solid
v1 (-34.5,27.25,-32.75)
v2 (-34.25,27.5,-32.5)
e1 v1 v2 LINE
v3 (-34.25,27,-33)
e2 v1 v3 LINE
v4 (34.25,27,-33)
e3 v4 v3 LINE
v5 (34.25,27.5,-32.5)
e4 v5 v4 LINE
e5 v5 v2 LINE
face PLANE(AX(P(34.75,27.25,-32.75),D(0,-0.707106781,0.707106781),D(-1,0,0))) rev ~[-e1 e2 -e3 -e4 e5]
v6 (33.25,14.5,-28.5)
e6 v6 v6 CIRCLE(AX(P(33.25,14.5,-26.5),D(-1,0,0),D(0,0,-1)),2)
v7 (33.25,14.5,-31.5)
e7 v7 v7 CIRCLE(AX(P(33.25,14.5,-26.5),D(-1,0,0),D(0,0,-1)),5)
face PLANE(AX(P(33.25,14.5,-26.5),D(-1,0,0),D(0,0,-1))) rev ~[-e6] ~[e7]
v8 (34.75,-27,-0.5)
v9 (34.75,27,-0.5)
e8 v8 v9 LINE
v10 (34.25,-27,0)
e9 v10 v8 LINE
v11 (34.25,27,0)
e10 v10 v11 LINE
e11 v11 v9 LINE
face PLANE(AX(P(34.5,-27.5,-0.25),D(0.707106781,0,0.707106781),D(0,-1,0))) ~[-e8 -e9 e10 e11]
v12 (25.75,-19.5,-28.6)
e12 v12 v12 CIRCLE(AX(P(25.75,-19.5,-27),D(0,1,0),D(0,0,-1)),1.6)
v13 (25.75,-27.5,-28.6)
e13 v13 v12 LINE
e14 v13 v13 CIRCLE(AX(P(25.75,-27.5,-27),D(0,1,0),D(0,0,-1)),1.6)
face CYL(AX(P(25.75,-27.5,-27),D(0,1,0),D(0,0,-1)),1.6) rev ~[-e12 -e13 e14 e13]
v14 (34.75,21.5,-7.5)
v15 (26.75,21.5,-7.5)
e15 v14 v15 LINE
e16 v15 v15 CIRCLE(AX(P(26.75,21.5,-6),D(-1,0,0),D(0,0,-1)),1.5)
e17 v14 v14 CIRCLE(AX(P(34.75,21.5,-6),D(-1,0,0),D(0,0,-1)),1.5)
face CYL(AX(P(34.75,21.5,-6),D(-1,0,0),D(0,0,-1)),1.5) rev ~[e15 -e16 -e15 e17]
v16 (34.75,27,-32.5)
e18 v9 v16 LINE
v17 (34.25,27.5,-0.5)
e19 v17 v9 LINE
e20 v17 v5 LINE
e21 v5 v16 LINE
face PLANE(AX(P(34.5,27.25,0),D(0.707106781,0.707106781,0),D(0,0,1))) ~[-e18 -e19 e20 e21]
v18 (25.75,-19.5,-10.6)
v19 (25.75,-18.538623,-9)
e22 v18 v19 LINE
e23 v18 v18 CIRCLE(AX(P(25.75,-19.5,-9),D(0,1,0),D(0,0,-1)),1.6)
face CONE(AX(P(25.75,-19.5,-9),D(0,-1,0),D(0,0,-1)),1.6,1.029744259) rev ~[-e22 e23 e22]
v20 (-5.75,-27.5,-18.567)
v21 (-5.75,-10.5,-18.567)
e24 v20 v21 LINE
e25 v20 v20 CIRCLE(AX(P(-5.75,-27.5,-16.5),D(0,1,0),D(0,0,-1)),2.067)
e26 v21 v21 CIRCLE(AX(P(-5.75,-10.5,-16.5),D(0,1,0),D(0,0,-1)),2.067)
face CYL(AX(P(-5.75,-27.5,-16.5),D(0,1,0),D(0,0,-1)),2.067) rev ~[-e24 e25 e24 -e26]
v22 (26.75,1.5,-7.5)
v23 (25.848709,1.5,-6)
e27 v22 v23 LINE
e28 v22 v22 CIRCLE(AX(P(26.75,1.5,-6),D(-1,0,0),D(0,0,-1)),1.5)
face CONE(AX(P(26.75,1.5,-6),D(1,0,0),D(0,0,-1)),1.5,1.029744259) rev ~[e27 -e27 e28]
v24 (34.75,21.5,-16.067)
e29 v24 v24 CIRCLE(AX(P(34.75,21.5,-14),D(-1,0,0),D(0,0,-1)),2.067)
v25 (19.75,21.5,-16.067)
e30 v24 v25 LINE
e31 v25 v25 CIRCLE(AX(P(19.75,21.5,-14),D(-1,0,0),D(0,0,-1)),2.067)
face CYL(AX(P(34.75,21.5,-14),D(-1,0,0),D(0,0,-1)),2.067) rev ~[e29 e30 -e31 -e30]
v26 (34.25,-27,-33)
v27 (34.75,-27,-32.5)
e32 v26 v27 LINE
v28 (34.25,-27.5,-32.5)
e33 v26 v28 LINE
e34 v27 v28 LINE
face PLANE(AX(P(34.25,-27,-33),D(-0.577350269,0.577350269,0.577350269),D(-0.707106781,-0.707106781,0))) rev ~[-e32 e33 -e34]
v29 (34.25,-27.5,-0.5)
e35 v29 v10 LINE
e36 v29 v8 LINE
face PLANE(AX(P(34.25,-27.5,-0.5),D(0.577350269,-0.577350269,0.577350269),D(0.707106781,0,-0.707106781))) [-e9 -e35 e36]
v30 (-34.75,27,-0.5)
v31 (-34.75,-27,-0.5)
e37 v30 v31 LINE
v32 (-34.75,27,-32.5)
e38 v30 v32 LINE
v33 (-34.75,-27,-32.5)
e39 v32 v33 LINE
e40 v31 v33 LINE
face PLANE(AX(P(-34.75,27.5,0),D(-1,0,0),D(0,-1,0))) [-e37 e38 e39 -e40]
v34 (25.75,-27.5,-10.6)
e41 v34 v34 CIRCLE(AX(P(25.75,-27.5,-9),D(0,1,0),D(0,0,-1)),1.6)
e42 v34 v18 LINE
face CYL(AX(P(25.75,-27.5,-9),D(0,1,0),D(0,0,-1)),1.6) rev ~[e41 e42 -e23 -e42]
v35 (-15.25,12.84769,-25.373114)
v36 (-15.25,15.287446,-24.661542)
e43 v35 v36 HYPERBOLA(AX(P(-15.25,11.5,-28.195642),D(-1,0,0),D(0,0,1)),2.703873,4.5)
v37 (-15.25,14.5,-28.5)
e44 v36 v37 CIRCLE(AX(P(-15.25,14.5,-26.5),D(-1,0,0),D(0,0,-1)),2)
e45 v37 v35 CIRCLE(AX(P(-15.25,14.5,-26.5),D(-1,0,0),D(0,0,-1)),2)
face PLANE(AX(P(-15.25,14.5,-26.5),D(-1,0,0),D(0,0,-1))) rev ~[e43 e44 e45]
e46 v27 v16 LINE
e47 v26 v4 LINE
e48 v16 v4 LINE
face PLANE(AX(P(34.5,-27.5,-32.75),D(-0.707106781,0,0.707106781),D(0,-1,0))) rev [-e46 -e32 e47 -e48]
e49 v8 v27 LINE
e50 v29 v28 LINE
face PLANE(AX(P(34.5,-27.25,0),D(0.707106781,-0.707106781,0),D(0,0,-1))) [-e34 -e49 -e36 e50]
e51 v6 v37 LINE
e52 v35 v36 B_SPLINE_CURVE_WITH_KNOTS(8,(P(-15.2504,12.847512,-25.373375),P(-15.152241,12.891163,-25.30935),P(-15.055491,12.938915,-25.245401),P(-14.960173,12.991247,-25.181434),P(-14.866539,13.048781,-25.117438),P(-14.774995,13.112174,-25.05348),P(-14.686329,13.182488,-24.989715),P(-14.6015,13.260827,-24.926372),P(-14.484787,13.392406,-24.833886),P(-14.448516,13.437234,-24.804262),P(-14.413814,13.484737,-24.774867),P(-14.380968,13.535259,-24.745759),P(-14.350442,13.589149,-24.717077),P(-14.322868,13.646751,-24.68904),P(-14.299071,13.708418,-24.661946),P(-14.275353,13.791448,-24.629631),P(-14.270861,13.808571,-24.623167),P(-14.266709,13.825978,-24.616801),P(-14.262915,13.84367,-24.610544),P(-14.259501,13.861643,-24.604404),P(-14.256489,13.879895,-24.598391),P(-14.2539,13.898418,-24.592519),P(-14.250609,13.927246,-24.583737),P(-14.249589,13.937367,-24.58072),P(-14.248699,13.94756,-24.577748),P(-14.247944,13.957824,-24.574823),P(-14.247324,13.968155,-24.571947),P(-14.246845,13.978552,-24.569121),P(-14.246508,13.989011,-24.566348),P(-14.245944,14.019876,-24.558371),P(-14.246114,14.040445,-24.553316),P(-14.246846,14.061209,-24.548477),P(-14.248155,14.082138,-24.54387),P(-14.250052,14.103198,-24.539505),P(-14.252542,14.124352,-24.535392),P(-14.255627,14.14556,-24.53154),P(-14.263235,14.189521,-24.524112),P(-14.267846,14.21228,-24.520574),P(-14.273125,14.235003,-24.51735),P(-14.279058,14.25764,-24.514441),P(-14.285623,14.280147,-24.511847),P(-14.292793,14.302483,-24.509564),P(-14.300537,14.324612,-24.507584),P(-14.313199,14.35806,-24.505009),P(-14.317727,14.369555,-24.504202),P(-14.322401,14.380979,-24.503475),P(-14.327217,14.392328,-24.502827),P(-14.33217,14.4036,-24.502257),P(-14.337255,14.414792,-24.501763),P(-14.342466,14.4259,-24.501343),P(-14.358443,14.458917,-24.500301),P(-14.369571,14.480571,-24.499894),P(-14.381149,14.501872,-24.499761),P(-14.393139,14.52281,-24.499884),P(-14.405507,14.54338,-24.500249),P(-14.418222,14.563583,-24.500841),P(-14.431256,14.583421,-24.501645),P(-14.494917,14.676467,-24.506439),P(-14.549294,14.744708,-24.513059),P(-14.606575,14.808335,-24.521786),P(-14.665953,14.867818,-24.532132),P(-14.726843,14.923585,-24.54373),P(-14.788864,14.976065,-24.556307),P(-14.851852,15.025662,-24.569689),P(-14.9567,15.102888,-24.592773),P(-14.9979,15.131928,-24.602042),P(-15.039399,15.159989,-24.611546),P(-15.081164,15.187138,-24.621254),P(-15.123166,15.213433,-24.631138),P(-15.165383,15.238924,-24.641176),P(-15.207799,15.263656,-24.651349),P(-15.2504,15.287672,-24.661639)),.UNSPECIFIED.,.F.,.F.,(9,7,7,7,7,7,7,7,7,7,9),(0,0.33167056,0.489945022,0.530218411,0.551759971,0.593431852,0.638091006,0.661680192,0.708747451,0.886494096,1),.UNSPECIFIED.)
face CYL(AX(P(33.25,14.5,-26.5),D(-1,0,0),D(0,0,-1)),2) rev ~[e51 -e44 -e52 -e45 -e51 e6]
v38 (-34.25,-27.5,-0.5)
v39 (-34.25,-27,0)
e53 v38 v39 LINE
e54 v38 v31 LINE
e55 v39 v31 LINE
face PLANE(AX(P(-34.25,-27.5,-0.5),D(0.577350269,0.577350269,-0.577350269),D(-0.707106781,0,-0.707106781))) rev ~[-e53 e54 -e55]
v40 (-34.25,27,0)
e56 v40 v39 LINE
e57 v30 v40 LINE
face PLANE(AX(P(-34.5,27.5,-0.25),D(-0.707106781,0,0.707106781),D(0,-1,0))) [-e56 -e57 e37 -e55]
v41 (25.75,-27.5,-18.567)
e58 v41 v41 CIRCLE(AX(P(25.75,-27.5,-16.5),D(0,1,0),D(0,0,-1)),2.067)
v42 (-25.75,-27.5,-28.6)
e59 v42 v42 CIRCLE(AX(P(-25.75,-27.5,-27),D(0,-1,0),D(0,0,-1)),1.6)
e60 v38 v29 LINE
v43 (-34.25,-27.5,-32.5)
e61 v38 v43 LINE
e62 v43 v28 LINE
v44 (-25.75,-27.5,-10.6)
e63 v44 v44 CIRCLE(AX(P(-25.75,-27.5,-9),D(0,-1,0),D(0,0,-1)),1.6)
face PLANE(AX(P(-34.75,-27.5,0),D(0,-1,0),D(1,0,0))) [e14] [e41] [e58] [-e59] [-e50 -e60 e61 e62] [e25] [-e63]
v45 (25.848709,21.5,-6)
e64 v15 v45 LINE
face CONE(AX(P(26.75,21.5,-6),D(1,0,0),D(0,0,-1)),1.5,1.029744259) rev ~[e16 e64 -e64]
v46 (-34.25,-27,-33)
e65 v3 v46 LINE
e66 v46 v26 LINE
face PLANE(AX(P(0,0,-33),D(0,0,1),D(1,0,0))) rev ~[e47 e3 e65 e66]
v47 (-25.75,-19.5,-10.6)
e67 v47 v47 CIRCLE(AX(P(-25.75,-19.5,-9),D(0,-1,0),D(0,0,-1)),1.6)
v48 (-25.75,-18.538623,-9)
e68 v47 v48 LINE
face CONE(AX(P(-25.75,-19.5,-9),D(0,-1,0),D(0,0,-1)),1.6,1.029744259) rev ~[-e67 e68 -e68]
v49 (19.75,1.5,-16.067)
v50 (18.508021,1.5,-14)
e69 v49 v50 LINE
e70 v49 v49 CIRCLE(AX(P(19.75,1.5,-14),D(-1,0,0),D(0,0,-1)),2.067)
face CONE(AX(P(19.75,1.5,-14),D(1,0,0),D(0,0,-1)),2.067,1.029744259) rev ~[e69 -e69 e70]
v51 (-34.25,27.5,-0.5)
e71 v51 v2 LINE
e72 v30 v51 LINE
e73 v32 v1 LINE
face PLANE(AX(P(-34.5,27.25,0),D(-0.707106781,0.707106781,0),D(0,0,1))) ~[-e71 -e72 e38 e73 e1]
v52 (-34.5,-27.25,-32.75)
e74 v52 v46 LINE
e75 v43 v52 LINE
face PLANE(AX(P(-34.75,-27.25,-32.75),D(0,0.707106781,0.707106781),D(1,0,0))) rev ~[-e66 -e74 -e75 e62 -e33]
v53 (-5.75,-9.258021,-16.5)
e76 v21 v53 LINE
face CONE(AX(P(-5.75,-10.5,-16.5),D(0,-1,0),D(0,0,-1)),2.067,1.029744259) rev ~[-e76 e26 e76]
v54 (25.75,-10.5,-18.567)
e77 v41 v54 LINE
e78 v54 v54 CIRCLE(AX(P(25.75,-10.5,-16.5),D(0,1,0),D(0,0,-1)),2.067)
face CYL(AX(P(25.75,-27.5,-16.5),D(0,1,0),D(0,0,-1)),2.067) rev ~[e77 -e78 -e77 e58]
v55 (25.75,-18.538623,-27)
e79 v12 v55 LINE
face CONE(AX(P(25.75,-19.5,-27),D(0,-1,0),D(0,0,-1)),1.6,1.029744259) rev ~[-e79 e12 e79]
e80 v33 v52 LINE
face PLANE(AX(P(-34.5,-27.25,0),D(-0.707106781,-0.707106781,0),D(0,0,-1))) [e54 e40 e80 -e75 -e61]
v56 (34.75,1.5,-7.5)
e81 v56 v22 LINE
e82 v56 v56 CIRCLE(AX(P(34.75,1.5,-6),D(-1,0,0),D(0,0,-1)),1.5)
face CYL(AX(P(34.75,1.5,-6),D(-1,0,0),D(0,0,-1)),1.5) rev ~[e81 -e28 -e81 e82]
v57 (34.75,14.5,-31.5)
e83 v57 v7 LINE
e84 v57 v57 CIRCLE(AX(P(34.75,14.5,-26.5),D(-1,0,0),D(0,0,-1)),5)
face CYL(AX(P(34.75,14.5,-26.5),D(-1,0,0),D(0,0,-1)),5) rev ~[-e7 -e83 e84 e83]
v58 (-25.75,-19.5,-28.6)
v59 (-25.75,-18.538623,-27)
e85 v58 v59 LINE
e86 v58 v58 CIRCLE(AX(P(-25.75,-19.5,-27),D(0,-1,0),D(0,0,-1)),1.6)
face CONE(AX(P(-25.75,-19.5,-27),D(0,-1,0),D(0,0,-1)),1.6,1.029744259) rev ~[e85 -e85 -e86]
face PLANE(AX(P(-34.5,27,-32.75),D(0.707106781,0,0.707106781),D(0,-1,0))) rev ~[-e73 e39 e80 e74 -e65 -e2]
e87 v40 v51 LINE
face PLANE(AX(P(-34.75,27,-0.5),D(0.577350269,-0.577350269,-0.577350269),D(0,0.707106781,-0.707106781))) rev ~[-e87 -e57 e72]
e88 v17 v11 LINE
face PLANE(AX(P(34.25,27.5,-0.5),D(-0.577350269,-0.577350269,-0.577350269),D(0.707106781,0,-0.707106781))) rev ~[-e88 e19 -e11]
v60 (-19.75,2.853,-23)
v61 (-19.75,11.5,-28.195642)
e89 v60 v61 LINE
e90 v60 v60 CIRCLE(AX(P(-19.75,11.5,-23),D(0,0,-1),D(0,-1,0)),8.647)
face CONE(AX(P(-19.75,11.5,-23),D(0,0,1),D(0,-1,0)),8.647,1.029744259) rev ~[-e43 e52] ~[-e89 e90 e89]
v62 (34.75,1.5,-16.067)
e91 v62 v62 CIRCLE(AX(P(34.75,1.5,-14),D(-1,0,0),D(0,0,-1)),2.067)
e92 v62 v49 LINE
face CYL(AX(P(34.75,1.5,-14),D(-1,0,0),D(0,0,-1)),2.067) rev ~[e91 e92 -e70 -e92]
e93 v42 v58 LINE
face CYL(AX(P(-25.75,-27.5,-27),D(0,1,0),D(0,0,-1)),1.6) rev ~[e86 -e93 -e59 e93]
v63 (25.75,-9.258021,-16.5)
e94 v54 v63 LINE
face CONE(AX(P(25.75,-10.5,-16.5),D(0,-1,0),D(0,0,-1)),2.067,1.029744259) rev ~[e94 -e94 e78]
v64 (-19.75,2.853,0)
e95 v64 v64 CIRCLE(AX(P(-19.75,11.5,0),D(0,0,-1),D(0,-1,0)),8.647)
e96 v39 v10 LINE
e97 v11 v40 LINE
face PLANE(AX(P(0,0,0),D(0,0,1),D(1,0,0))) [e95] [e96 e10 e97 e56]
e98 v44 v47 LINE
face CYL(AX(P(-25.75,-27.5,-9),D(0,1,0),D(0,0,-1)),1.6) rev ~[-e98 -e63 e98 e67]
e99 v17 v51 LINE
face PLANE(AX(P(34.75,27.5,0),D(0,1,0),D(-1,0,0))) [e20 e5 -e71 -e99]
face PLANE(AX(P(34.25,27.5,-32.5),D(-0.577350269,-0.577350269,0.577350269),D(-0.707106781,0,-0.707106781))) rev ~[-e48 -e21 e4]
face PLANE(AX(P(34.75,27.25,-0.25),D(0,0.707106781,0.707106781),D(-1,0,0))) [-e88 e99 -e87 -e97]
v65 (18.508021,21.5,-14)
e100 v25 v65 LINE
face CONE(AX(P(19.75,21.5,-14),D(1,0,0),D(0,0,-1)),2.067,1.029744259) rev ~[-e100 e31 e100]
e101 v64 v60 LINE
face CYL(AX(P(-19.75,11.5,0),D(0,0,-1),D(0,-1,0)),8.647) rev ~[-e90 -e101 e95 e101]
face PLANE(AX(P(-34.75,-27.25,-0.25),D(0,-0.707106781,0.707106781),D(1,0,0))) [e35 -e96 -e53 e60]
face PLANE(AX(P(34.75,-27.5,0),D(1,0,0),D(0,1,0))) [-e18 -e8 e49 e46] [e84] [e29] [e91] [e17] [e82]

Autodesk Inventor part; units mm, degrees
ref_plane "XZ Plane" through (0, 0, 0) normal (0, 1, 0) x (-1, 0, 0)
ref_plane "XY Plane" through (0, 0, 0) normal (0, 0, 1) x (1, 0, 0)
sketch "Skizze1" plane through (0, 0, 0) normal (0, 0, 1) x (1, 0, 0)
  line L0 (-34.75, -27.5) -> (34.75, -27.5)
  line L1 (34.75, -27.5) -> (34.75, 27.5)
  line L2 (34.75, 27.5) -> (-34.75, 27.5)
  line L3 (-34.75, 27.5) -> (-34.75, -27.5)
  line L4 (-34.75, -27.5) -> (34.75, 27.5) construction
  line L5 (34.75, -27.5) -> (-34.75, 27.5) construction
  point P0 (0, 0)
  dimension "d0" = 69.5
  dimension "d1" = 55
extrude "Extrusion1" add sketch "Skizze1" against normal blind 33
sketch "Skizze2" plane through (0, 0, 0) normal (0, 0, 1) x (1, 0, 0)
  line L0 (-34.75, 27.5) -> (-34.75, -27.5) projected
  line L1 (-34.75, -27.5) -> (34.75, -27.5) projected
  point P0 (0, 0)
  point P1 (-19.75, 11.5)
  dimension "d11" = 15
  dimension "d12" = 39
hole "Bohrung1" at (-19.75, 11.5, 0) direction (0, 0, -1) diameter 17.294 depth 23 tip angle 118 thread size "M20x2.5" class "6H" standard "ISO Metric profile"
sketch "Skizze4" plane through (34.75, -27.5, 0) normal (1, 0, 0) x (0, 0, -1)
  line L0 (0, 0) -> (33, 0) projected
  line L1 (33, 55) -> (33, 0) projected
  point P0 (0, 27.5)
  point P1 (6, 49)
  point P2 (14, 49)
  point P3 (6, 29)
  point P4 (14, 29)
  dimension "d21" = 29
  dimension "d22" = 20
  dimension "d23" = 27
  dimension "d24" = 27
  dimension "d85" = 8
hole "Bohrung3" at (34.75, 21.5, -14) at (34.75, 1.5, -14) direction (-1, 0, 0) diameter 4.134 depth 15 tip angle 118 thread size "M5x0.8" class "6H" standard "ISO Metric profile"
hole "Bohrung4" at (34.75, 21.5, -6) at (34.75, 1.5, -6) direction (-1, 0, 0) diameter 3 depth 8 tip angle 118
sketch "Skizze5" plane through (34.75, -27.5, 0) normal (1, 0, 0) x (0, 0, -1)
  line L0 (33, 55) -> (33, 0) projected
  line L1 (0, 0) -> (0, 55) projected
  line L2 (0, 42) -> (33, 42) construction
  line L3 (0, 55) -> (33, 55) projected
  point P0 (0, 27.5)
  point P1 (26.5, 42)
  point P2 (16.5, 42)
  dimension "d48" = 6.5
  dimension "d49" = 13
hole "Bohrung5" at (34.75, 14.5, -26.5) direction (-1, 0, 0) diameter 4 depth 50 counterbore diameter 10 counterbore depth 1.5
sketch "Skizze6" plane through (-34.75, -27.5, 0) normal (0, -1, 0) x (1, 0, 0)
  line L0 (69.5, -33) -> (0, -33) projected
  line L1 (69.5, 0) -> (69.5, -33) projected
  line L2 (69.5, -16.5) -> (0, -16.5) construction
  point P0 (34.75, 0)
  point P1 (60.5, -27)
  point P2 (60.5, -9)
  dimension "d57" = 6
  dimension "d58" = 18
  dimension "d59" = 9
  dimension "d60" = 9
hole "Bohrung6" at (25.75, -27.5, -27) at (25.75, -27.5, -9) direction (0, 1, 0) diameter 3.2 depth 8 tip angle 118
sketch "Skizze7" plane through (-34.75, -27.5, 0) normal (0, -1, 0) x (1, 0, 0)
  circle A0 centre (60.5, -27) radius 1.6 projected
  line L0 (69.5, 0) -> (69.5, -33) projected
  point P0 (34.75, 0)
  point P1 (60.5, -16.5)
  point P2 (69.5, -16.5)
hole "Bohrung7" at (25.75, -27.5, -16.5) direction (0, 1, 0) diameter 4.134 depth 17 tip angle 118 thread size "M5x0.8" class "6H" standard "ISO Metric profile"
ref_plane "Arbeitsebene1" through (0, 0, 0) normal (1, 0, 0) x (0, 1, 0)
mirror "Spiegeln1" about plane through (0, 0, 0) normal (1, 0, 0) of "Bohrung6"
sketch "Skizze8" plane through (-34.75, -27.5, 0) normal (0, -1, 0) x (1, 0, 0)
  line L0 (69.5, 0) -> (69.5, -33) projected
  line L1 (0, 0) -> (0, -33) projected
  line L2 (69.5, 0) -> (69.5, -33) projected
  line L3 (0, 0) -> (69.5, 0) projected
  point P0 (34.75, 0)
  point P1 (29, -16.5)
  point P2 (69.5, -16.5)
  point P3 (69.5, -16.5)
  dimension "d76" = 29
  dimension "d77" = 16.5
hole "Bohrung8" at (-5.75, -27.5, -16.5) direction (0, 1, 0) diameter 4.134 depth 17 tip angle 118 thread size "M5x0.8" class "6H" standard "ISO Metric profile"
chamfer "Fasen1" distance 0.5 angle 45 11 edges at (34.75, 0, 0) (0, 27.5, 0) (-34.75, 0, 0) (0, -27.5, 0) (34.75, -27.5, -16.5) (34.75, 0, -33) (34.75, 27.5, -16.5) (-34.75, 27.5, -16.5) (0, 27.5, -33) (0, -27.5, -33) (-34.75, -27.5, -16.5)
chamfer "Fasen2" distance 0.5 angle 45 1 edges at (-34.75, 0, -33)
equation "\"d24\" = d23"
equation "\"d60\" = d59"
properties part number "Steuerblock" material "Stahl, Legierung"
